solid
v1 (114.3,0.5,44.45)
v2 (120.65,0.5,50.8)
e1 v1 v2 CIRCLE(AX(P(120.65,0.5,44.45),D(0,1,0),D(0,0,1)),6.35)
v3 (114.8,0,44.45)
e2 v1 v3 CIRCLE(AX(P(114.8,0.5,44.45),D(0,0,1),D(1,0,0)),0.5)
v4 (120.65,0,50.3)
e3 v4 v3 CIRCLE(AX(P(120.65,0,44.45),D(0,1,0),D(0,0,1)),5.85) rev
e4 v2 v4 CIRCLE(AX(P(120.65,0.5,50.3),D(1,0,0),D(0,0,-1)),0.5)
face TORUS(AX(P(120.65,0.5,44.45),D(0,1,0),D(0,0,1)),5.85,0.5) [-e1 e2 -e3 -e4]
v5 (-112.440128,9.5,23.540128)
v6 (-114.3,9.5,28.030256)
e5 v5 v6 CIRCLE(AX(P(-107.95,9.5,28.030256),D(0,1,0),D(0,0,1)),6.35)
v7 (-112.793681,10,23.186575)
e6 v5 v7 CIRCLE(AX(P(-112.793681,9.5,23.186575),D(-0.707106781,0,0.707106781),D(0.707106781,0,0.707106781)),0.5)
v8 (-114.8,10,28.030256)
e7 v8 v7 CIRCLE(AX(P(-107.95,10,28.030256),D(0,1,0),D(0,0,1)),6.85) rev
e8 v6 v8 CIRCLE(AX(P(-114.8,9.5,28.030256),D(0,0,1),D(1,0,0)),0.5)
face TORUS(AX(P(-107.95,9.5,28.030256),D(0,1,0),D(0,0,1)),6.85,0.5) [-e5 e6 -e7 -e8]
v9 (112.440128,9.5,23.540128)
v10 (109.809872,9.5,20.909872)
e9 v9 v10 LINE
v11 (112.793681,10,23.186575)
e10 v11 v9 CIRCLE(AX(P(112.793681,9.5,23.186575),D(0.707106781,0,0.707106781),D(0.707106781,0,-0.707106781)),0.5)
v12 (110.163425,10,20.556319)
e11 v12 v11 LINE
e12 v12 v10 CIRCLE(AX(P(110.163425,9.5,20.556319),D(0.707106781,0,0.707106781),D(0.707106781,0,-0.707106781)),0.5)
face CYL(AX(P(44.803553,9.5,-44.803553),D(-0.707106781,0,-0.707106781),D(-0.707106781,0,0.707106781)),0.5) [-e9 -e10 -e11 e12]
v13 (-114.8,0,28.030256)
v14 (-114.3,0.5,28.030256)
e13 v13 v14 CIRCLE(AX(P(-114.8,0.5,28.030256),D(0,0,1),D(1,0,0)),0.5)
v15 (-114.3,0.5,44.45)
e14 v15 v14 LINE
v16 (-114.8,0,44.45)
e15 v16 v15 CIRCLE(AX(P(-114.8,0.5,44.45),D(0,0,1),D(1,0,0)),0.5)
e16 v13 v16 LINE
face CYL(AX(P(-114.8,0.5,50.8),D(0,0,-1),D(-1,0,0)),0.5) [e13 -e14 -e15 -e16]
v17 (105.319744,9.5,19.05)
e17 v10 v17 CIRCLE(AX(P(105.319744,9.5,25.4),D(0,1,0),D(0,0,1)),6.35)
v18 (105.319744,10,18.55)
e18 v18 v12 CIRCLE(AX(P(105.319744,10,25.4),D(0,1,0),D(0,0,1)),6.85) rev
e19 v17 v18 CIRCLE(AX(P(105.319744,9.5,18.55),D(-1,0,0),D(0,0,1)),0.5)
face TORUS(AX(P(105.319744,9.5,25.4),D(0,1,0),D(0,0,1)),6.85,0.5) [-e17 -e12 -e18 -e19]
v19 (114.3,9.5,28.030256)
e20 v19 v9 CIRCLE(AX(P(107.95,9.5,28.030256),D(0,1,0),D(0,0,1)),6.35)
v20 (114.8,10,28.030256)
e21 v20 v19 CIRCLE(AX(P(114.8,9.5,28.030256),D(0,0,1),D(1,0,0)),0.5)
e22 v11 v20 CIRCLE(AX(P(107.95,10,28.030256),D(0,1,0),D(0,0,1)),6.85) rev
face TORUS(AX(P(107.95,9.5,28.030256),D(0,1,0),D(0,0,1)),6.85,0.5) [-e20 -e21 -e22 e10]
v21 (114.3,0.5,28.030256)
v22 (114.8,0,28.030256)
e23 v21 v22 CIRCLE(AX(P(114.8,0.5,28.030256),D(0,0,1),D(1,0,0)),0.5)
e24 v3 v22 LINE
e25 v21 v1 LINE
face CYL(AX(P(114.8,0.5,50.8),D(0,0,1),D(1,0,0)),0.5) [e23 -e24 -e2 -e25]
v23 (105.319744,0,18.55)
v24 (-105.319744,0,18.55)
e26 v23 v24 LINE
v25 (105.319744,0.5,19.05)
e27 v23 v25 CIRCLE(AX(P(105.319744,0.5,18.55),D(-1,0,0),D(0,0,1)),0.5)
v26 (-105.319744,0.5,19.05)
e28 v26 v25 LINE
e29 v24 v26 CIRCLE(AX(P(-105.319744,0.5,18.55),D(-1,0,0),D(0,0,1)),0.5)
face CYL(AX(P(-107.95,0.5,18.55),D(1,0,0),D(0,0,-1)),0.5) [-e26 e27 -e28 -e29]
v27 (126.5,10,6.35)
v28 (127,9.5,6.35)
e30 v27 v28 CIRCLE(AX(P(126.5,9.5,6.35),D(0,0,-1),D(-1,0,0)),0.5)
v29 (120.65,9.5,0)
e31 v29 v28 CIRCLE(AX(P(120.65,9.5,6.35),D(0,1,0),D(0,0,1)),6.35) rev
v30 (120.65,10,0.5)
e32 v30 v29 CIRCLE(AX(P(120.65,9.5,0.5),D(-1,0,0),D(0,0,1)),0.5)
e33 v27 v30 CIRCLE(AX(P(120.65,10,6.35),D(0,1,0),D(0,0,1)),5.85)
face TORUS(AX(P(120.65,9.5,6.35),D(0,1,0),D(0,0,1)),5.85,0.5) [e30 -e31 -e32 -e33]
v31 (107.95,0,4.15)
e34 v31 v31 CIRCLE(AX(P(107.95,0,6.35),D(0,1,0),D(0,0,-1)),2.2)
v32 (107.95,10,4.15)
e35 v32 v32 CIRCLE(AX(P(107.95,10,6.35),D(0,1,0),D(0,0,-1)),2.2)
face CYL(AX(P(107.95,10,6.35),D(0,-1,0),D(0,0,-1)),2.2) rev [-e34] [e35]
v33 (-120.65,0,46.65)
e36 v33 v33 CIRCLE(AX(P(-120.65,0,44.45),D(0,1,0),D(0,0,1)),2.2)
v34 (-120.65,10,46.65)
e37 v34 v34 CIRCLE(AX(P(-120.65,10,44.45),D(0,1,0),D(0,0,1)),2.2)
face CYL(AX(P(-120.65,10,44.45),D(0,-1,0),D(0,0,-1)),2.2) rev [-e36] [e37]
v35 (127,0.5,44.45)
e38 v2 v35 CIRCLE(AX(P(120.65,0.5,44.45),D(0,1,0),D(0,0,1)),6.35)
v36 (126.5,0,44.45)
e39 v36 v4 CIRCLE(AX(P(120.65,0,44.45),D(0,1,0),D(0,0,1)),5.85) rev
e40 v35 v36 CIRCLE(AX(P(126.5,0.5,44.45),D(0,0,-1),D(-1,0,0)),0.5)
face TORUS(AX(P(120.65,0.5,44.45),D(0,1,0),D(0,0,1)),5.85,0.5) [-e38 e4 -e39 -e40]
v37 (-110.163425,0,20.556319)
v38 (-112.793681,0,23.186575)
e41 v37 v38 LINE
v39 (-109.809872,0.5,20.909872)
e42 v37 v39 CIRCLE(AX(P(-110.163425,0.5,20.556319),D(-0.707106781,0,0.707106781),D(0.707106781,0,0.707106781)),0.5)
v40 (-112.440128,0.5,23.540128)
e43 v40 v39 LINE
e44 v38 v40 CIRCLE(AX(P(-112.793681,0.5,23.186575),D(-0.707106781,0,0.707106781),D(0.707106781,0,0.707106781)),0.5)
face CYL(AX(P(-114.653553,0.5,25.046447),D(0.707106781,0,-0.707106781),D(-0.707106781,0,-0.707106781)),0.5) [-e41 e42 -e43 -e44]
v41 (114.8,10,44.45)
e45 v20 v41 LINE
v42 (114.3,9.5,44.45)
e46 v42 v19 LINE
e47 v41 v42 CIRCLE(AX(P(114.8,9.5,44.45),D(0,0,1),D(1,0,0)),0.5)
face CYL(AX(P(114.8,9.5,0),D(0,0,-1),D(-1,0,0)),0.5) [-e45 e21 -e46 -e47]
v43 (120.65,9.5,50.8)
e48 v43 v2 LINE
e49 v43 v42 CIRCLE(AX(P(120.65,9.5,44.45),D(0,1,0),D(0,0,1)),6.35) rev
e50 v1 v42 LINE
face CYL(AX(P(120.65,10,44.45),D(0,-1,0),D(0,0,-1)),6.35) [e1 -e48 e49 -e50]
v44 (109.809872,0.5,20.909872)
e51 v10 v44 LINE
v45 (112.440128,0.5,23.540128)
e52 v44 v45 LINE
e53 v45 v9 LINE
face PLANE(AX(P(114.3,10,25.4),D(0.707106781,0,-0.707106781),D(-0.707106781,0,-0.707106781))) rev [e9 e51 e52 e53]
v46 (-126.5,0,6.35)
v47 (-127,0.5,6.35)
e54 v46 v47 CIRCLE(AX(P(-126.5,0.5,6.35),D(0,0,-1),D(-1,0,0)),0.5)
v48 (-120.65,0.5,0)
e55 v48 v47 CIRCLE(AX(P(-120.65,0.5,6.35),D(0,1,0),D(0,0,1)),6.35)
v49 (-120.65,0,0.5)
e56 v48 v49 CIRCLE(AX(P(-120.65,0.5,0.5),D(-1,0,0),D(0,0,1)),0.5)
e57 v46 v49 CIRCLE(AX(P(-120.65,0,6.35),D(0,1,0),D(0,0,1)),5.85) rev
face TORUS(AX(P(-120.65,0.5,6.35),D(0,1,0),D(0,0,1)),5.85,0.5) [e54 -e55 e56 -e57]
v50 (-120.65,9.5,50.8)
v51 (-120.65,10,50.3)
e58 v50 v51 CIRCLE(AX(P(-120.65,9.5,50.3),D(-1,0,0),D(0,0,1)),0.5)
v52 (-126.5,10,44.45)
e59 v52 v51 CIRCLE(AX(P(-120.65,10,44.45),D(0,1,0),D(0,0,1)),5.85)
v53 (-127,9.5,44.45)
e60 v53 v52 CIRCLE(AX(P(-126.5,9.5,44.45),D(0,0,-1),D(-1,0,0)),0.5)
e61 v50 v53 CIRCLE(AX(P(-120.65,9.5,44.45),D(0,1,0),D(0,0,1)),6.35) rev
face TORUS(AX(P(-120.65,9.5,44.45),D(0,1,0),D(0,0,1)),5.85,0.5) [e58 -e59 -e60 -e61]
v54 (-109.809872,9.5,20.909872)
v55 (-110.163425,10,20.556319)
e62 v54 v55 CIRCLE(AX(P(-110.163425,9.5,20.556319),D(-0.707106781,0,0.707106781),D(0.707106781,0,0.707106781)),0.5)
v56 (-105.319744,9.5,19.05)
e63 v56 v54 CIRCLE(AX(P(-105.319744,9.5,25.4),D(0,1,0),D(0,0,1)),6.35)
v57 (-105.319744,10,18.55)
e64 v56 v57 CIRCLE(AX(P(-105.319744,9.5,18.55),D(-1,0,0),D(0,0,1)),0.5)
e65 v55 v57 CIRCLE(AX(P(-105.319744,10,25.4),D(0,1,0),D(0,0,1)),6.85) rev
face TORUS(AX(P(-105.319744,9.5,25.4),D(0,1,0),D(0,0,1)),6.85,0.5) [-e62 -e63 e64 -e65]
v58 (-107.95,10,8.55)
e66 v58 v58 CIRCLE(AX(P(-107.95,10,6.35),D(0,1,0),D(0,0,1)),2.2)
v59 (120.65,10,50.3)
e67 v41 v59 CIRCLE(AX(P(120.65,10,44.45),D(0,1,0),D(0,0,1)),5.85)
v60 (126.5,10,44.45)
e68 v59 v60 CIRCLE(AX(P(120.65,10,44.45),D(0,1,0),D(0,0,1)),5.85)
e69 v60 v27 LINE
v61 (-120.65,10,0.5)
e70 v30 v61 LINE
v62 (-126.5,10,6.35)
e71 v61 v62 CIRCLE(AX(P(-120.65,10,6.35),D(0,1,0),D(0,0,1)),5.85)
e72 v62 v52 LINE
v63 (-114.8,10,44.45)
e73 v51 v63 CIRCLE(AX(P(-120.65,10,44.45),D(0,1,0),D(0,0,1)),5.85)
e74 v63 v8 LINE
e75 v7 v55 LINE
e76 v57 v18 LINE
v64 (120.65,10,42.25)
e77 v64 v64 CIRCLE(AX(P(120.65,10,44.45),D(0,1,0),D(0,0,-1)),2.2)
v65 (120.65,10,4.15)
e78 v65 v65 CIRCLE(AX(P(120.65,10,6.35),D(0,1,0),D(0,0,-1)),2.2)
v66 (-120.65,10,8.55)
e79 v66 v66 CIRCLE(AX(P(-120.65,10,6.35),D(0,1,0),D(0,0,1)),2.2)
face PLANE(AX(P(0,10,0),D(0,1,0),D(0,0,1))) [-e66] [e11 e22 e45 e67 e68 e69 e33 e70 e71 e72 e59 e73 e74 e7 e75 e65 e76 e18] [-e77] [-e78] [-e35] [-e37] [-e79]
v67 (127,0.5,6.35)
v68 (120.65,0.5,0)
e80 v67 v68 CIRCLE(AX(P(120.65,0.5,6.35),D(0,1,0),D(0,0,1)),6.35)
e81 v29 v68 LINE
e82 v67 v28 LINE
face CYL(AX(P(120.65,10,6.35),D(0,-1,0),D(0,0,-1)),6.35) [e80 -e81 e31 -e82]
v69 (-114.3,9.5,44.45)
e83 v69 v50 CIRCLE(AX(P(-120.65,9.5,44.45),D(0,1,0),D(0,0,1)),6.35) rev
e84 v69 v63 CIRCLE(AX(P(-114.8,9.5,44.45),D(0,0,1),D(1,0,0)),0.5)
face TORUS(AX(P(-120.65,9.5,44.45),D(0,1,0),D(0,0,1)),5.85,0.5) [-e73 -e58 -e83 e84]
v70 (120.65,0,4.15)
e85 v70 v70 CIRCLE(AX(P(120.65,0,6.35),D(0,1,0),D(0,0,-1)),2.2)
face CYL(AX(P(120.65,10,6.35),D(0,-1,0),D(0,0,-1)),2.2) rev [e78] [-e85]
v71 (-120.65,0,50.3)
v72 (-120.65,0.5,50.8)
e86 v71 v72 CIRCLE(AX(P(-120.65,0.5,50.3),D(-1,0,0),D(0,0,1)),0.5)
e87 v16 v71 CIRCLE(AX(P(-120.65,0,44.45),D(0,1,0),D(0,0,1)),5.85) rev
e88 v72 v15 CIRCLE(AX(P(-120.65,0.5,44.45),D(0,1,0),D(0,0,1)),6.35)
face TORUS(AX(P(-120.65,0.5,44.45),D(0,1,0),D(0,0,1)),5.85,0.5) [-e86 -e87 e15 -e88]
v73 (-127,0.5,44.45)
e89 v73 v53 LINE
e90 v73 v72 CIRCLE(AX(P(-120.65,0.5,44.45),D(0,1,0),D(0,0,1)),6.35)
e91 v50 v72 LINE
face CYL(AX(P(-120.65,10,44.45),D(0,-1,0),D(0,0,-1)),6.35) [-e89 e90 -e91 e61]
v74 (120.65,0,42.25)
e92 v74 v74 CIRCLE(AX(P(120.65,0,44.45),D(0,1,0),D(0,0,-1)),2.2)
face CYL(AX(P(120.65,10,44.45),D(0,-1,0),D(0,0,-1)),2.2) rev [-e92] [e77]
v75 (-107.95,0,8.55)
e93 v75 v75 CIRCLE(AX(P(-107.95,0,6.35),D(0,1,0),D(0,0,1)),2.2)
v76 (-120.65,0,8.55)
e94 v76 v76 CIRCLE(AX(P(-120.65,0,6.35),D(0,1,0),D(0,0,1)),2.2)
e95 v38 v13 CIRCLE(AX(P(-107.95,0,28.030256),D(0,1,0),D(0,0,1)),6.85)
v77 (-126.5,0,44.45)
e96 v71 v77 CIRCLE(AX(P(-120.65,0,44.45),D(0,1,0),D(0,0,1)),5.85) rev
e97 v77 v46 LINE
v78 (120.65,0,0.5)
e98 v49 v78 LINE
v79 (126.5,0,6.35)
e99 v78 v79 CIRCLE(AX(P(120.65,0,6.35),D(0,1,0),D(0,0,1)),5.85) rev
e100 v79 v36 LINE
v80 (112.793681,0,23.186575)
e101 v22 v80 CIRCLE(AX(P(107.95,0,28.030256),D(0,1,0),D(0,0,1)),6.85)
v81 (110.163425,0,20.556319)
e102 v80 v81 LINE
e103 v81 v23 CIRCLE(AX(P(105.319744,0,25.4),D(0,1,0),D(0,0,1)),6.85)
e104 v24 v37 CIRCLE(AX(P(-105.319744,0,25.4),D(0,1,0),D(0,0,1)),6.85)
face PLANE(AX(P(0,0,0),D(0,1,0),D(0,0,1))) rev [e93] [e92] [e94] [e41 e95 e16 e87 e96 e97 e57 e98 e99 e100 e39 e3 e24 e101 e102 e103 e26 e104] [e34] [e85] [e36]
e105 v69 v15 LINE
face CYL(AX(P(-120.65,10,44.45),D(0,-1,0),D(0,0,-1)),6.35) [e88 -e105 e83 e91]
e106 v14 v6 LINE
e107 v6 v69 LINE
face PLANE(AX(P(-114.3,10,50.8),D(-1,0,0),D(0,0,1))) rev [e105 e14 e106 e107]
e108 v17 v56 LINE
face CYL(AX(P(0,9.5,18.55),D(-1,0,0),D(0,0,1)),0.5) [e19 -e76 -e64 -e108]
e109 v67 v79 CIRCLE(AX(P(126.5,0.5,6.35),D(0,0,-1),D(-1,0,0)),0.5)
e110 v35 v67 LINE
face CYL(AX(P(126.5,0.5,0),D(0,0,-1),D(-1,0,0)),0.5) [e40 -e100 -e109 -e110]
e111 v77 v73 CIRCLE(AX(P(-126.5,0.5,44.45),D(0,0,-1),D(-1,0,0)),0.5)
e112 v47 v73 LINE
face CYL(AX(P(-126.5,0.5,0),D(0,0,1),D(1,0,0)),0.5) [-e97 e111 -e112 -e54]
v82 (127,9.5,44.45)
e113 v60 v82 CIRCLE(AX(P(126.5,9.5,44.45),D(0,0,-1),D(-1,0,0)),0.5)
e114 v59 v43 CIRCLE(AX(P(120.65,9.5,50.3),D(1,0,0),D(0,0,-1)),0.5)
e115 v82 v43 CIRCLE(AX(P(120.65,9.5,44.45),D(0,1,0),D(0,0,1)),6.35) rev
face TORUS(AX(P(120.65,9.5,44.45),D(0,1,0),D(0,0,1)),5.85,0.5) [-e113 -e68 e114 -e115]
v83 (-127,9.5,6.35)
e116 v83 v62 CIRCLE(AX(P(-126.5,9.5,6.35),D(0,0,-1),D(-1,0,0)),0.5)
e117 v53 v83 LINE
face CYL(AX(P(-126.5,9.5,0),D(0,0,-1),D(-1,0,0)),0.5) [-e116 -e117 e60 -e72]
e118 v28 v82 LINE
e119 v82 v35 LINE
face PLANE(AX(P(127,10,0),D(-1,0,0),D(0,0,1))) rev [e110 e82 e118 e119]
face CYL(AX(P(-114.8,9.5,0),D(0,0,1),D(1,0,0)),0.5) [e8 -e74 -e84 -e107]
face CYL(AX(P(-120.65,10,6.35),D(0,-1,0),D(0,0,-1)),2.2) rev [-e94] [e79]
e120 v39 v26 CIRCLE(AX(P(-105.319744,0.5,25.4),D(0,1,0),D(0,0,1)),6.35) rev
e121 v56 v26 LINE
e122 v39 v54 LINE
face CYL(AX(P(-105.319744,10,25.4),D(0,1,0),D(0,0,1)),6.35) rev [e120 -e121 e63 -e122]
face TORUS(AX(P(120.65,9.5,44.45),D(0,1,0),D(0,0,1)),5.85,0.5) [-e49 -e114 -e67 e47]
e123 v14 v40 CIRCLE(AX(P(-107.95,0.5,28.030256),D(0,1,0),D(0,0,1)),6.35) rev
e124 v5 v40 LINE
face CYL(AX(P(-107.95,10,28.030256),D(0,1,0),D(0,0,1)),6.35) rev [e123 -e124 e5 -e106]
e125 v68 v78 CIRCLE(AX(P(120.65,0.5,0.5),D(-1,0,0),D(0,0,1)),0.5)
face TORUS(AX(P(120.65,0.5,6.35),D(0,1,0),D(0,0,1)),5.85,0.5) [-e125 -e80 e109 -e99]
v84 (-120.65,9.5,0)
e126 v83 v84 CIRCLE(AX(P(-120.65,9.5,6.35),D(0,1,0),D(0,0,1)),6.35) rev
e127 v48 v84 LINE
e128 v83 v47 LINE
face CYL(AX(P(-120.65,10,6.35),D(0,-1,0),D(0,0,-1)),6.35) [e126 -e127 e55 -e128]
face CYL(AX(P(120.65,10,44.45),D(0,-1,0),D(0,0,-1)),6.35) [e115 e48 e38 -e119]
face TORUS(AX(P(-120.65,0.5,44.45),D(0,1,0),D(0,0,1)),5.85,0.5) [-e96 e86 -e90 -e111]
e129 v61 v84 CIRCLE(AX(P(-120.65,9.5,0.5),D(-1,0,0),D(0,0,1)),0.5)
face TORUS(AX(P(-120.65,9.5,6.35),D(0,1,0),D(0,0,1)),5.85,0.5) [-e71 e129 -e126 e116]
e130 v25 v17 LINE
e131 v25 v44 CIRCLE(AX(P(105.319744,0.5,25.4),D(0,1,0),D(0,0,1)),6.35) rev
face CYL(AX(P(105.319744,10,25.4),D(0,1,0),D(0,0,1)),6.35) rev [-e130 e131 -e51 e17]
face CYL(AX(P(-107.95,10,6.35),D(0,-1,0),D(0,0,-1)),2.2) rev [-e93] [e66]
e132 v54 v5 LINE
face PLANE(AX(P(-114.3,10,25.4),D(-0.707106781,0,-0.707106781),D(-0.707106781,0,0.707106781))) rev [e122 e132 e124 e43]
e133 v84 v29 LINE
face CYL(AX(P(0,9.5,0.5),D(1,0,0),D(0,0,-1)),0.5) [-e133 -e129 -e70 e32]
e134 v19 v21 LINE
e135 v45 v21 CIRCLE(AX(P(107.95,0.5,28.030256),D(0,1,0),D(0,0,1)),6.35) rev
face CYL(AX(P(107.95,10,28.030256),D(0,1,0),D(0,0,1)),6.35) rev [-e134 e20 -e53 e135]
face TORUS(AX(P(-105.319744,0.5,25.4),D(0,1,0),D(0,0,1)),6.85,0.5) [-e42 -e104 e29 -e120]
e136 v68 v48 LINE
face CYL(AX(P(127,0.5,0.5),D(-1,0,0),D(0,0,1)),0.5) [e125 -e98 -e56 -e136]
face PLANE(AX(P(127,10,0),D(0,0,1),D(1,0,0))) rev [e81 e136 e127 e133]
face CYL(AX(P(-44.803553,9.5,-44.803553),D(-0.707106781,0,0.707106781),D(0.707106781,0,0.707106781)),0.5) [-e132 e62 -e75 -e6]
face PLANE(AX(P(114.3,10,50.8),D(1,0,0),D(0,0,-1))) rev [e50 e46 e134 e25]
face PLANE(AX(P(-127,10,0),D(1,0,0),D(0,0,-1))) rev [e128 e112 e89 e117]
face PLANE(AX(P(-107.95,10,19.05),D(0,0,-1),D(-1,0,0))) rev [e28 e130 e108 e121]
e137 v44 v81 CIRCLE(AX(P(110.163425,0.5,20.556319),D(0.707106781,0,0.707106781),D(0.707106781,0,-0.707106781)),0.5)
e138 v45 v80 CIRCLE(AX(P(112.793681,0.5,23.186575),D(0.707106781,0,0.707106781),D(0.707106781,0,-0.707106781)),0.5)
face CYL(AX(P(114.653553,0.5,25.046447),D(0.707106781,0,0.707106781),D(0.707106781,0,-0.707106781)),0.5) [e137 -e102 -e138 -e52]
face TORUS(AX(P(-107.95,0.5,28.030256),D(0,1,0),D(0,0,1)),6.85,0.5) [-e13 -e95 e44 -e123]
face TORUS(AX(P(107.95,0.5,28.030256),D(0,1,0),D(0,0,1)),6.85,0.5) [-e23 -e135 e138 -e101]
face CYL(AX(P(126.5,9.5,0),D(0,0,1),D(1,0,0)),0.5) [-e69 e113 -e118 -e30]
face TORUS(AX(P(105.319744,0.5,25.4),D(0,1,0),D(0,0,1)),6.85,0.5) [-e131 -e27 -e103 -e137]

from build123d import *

# Parameters (mm, degrees)
SKETCH1_R           = 2.2
BOSS_EXTRUDE1_DEPTH = 10
FILLET1_R           = 6.35
FILLET2_R           = 6.35
FILLET3_R           = 0.5


with BuildPart() as part:
    # Sketch1 → Boss-Extrude1 (new body)
    with BuildSketch(Plane(origin=(0, 0, 0), x_dir=(1, 0, 0), z_dir=(0, 1, 0))):
        Polygon((127, 0), (-127, 0), (-127, -50.8), (-114.3, -50.8), (-114.3, -25.4), (-107.95, -19.05), (107.95, -19.05), (114.3, -25.4), (114.3, -50.8), (127, -50.8), align=None)
        with Locations(Location((-120.65, -6.35, 0), (0, 0, 270))):
            Circle(SKETCH1_R, mode=Mode.SUBTRACT)
        with Locations(Location((-107.95, -6.35, 0), (0, 0, 270))):
            Circle(SKETCH1_R, mode=Mode.SUBTRACT)
        with Locations(Location((-120.65, -44.45, 0), (0, 0, 270))):
            Circle(SKETCH1_R, mode=Mode.SUBTRACT)
        with Locations(Location((120.65, -44.45, 0), (0, 0, 90))):
            Circle(SKETCH1_R, mode=Mode.SUBTRACT)
        with Locations(Location((107.95, -6.35, 0), (0, 0, 90))):
            Circle(SKETCH1_R, mode=Mode.SUBTRACT)
        with Locations(Location((120.65, -6.35, 0), (0, 0, 90))):
            Circle(SKETCH1_R, mode=Mode.SUBTRACT)
    extrude(amount=BOSS_EXTRUDE1_DEPTH)

    # Fillet1
    fillet1_edges = [part.edges().sort_by_distance(p)[0] for p in [
        (127, 5, 0),
        (127, 5, 50.8),
        (114.3, 5, 50.8),
        (-114.3, 5, 50.8),
        (-127, 5, 50.8),
        (-127, 5, 0),
    ]]
    fillet(fillet1_edges, radius=FILLET1_R - 0.0001)  # a hair under: the kernel refuses the full size

    # Fillet2
    fillet2_edges = [part.edges().sort_by_distance(p)[0] for p in [
        (114.3, 5, 25.4),
        (107.95, 5, 19.05),
        (-107.95, 5, 19.05),
        (-114.3, 5, 25.4),
    ]]
    fillet(fillet2_edges, radius=FILLET2_R)

    # Fillet3
    fillet3_edges = [part.edges().sort_by_distance(p)[0] for p in [
        (0, 0, 0),
        (0, 10, 0),
        (-127, 0, 25.4),
        (127, 0, 25.4),
        (-114.3, 0, 36.240178061),
        (-125.14015735, 0, 1.85984265),
        (-125.14015735, 0, 48.94015735),
        (-116.15984265, 0, 48.94015735),
        (116.15984265, 0, 48.94015735),
        (125.14015735, 0, 48.94015735),
        (125.14015735, 0, 1.85984265),
        (127, 10, 25.4),
        (-127, 10, 25.4),
        (-114.3, 10, 36.240178061),
        (-125.14015735, 10, 1.85984265),
        (-125.14015735, 10, 48.94015735),
        (-116.15984265, 10, 48.94015735),
        (116.15984265, 10, 48.94015735),
        (125.14015735, 10, 48.94015735),
        (125.14015735, 10, 1.85984265),
        (114.3, 0, 36.240178061),
        (114.3, 10, 36.240178061),
        (111.125, 0, 22.225),
        (111.125, 10, 22.225),
        (0, 0, 19.05),
        (0, 10, 19.05),
        (-111.125, 0, 22.225),
        (-111.125, 10, 22.225),
        (113.816635031, 0, 25.600216326),
        (113.816635031, 10, 25.600216326),
        (107.749783674, 0, 19.533364969),
        (107.749783674, 10, 19.533364969),
        (-113.816635031, 0, 25.600216326),
        (-113.816635031, 10, 25.600216326),
        (-107.749783674, 0, 19.533364969),
        (-107.749783674, 10, 19.533364969),
    ]]
    fillet(fillet3_edges, radius=FILLET3_R)


solid = part.part
